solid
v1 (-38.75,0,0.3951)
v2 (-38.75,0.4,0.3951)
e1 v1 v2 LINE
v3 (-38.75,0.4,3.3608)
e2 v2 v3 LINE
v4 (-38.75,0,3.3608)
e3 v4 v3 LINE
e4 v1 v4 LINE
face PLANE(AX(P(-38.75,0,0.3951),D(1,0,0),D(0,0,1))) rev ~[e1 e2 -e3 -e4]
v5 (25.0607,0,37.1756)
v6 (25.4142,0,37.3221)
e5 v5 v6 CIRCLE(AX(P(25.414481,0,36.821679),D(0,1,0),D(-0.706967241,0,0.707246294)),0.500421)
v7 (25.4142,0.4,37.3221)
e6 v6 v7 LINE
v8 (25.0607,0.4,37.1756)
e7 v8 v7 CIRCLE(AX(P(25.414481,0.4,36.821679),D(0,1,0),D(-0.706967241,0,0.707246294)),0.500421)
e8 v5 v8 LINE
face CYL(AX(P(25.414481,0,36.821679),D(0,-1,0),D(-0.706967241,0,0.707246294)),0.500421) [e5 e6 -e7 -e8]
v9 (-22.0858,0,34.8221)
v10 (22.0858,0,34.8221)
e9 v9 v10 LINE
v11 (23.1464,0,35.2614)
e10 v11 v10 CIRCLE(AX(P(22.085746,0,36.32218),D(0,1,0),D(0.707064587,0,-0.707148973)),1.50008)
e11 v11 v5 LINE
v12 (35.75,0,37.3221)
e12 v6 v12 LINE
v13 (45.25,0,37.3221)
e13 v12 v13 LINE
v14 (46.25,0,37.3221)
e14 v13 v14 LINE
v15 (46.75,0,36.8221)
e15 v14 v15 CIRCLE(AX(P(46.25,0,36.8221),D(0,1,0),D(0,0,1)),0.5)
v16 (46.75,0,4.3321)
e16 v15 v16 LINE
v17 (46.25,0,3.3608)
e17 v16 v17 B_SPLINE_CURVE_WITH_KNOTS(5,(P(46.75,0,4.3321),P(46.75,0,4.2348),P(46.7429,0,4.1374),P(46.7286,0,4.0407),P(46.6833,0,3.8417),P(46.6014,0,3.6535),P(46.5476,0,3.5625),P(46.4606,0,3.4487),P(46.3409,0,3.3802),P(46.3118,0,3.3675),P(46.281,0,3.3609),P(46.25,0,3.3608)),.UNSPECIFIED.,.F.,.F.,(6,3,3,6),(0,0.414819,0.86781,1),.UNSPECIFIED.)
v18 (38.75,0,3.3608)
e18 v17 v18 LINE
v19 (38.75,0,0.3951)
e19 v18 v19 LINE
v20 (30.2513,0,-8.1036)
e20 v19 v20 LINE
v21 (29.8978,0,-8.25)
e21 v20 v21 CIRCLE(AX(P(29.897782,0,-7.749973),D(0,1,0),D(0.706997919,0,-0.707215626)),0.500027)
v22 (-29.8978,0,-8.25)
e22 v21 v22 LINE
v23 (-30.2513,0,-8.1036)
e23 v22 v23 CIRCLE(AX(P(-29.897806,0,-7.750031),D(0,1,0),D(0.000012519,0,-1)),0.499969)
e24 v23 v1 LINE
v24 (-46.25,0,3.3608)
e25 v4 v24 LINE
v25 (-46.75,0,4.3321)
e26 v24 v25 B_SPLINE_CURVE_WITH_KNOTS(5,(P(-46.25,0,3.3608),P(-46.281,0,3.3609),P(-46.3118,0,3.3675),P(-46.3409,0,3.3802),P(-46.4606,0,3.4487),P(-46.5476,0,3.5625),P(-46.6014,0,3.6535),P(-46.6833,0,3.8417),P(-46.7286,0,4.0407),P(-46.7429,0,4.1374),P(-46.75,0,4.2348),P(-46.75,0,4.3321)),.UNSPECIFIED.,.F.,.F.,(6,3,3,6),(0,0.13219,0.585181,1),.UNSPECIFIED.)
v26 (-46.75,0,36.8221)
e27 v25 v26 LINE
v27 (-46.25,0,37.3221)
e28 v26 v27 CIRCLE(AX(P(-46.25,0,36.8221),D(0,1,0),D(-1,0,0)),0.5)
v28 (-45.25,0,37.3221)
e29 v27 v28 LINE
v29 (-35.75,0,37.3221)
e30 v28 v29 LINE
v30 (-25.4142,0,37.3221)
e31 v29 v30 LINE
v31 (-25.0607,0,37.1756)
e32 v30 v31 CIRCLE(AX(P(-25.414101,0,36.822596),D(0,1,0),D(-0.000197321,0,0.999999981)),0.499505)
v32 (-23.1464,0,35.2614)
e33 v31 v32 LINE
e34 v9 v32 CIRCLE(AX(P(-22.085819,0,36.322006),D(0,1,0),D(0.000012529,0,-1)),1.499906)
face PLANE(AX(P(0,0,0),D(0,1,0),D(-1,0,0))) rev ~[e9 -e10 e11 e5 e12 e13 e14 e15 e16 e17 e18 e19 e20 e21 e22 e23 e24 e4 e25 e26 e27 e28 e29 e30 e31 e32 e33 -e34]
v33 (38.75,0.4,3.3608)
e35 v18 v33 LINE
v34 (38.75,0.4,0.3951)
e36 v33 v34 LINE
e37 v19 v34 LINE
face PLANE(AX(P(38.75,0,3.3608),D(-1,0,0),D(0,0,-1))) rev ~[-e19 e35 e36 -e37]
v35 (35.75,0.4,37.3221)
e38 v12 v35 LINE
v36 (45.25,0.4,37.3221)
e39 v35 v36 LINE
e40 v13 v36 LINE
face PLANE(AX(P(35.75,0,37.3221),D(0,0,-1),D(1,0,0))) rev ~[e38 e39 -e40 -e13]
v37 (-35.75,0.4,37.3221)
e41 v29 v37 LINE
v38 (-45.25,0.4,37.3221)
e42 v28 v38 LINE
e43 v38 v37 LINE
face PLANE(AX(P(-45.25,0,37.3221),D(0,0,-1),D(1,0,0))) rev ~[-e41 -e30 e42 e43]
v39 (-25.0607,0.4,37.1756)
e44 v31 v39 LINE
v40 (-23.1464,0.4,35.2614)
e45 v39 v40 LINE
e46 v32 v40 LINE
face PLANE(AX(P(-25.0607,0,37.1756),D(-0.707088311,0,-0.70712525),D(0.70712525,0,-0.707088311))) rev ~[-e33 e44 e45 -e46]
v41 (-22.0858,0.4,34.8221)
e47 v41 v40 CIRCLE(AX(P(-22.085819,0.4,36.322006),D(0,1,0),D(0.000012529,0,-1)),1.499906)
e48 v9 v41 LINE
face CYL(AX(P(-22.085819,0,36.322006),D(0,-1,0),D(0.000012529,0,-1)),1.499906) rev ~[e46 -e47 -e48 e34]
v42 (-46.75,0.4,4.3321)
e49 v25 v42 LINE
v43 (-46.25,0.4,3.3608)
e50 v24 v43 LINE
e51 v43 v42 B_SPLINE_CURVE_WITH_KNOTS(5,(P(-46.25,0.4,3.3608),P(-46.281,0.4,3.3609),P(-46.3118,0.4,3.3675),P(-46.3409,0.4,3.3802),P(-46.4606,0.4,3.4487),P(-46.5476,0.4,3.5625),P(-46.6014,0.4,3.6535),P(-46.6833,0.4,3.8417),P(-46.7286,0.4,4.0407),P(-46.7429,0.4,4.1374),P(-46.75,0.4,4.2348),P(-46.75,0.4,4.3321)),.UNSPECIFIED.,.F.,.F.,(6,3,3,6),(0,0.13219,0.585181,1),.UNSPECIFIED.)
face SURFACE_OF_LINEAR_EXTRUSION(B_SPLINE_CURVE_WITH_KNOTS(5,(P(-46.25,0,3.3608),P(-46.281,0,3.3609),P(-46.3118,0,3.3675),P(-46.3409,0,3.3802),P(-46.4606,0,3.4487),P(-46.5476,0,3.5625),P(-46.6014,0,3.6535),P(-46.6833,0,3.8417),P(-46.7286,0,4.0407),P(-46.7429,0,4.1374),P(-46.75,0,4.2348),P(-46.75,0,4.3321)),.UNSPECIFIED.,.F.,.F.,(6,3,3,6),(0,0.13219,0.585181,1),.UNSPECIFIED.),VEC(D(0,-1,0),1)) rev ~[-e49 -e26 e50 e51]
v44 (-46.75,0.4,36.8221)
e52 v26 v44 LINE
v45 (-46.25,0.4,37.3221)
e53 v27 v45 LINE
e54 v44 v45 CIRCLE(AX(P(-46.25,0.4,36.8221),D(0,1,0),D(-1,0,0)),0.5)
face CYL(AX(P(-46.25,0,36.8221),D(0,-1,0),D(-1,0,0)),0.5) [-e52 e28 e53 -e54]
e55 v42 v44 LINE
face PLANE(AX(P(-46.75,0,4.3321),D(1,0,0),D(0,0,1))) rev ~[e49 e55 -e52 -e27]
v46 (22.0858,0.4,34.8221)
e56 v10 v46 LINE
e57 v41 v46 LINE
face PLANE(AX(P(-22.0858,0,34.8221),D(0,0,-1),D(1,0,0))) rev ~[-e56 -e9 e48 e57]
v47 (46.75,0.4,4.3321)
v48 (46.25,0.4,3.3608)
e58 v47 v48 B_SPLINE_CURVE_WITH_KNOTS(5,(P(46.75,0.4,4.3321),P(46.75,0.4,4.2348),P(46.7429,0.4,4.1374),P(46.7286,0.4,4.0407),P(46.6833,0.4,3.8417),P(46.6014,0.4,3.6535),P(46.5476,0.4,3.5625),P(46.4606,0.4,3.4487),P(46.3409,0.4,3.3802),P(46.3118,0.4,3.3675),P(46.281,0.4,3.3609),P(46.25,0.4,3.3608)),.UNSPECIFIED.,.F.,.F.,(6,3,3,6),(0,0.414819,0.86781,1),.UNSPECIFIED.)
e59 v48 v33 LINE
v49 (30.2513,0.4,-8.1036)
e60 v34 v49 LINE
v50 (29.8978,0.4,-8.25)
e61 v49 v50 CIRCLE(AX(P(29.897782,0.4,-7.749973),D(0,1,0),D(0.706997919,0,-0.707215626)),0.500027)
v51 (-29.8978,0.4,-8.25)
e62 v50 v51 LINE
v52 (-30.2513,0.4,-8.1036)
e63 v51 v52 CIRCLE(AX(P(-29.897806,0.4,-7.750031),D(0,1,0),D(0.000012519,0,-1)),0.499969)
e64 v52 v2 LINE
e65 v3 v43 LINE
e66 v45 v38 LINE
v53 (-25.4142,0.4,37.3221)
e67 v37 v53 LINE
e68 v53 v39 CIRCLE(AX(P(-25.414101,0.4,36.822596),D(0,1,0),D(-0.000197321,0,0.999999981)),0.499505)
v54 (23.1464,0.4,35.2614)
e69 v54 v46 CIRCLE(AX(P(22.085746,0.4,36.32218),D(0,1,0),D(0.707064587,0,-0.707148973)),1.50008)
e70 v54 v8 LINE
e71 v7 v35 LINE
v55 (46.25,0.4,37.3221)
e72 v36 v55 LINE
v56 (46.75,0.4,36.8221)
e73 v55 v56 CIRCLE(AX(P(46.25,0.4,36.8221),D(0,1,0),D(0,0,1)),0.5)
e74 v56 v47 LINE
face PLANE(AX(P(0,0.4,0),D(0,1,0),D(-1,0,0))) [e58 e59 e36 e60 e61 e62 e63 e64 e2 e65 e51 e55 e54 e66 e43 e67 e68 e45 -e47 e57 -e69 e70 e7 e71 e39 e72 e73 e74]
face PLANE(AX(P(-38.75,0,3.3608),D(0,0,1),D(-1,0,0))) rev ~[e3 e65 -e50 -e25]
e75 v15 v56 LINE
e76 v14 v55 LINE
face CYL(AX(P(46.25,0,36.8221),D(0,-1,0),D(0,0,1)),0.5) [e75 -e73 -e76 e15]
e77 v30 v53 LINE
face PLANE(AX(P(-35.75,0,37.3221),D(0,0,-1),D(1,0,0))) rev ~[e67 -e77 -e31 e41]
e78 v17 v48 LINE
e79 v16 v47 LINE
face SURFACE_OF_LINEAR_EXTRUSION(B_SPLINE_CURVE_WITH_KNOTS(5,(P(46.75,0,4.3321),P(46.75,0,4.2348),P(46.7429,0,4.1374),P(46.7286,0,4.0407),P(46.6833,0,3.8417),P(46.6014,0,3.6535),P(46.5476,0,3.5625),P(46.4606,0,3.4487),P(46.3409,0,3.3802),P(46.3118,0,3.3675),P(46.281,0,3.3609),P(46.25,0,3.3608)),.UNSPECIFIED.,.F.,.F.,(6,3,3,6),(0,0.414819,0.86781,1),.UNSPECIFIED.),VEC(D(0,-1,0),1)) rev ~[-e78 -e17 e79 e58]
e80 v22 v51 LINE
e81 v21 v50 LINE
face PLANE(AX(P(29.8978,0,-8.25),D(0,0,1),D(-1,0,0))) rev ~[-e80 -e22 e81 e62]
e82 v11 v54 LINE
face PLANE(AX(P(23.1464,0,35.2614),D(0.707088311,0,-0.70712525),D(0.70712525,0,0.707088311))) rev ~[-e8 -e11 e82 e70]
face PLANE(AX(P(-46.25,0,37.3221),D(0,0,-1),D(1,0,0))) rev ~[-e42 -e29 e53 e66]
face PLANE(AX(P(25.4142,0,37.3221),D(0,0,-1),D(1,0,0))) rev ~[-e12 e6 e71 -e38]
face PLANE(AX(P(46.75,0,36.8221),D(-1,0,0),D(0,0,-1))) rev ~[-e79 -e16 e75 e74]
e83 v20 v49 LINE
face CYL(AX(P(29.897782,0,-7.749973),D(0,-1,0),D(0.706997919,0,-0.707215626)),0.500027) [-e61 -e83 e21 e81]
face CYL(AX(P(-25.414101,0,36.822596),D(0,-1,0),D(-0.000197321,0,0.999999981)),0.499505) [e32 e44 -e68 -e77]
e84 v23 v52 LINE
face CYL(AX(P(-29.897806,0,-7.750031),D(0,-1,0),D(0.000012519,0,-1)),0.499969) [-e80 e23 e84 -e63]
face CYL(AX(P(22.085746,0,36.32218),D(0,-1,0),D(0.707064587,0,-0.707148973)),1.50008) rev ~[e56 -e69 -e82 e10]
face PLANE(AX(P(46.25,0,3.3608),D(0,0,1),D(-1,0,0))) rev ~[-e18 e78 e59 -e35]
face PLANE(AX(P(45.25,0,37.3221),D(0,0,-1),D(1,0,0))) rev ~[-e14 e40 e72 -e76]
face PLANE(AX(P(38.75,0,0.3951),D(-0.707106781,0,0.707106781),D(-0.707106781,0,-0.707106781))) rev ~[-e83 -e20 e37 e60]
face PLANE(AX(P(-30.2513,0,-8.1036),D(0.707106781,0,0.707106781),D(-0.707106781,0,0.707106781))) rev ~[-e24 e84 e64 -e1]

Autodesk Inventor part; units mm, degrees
ref_plane "YZ Plane" through (0, 0, 0) normal (1, 0, 0) x (0, 1, 0)
ref_plane "XZ Plane" through (0, 0, 0) normal (0, 1, 0) x (-1, 0, 0)
ref_plane "XY Plane" through (0, 0, 0) normal (0, 0, 1) x (1, 0, 0)
sketch "Náčrt1" plane through (0, 0, 0) normal (0, 1, 0) x (-1, 0, 0)
  line L0 (24, -47.25) -> (19.6818, -47.25)
  line L1 (24, -47.25) -> (24, -17.0868)
  line L2 (24, -17.0868) -> (49.75, -17.0868)
  line L3 (49.75, 48.4103) -> (49.75, -17.0868)
  line L4 (49.75, 48.4103) -> (-49.75, 48.4103)
  line L5 (-49.75, 48.4103) -> (-49.75, -17.0868)
  line L6 (-24, -17.0868) -> (-49.75, -17.0868)
  line L7 (-24, -47.25) -> (-24, -17.0868)
  line L8 (-19.6818, -47.25) -> (-24, -47.25)
  arc A0 (-18.3182, -47.25) -> (-19.6818, -47.25) centre (-19, -43.5625) ccw
  line L9 (-12, -47.25) -> (-18.3182, -47.25)
  line L10 (-12, -47.25) -> (-12, -40)
  line L11 (-12, -40) -> (-3.25, -40)
  arc A1 (-3, -40.25) -> (-3.25, -40) centre (-3.25, -40.25) ccw
  line L12 (-3, -40.25) -> (-3, -40.6521)
  arc A2 (-3, -40.6521) -> (-2.6294, -40.8711) centre (-2.75, -40.6521) ccw
  arc A3 (2.0811, -47.25) -> (-2.6294, -40.8711) centre (-0.7, -44.375) ccw
  line L13 (18.3182, -47.25) -> (2.0811, -47.25)
  arc A4 (19.6818, -47.25) -> (18.3182, -47.25) centre (19, -43.5625) ccw
  arc A5 (-30.6049, -8.4571) -> (-29.8978, -8.75) centre (-29.8978, -7.75) ccw
  line L14 (-30.6049, -8.4571) -> (-39.25, 0.188)
  line L15 (-39.25, 2.8608) -> (-39.25, 0.188)
  line L16 (-46.25, 2.8608) -> (-39.25, 2.8608)
  ellipse E0 centre (-46.25, 4.3321) end of major axis (-46.25, 2.8608) minor radius 1 (-47.25, 4.3321) -> (-46.25, 2.8608) ccw
  line L17 (-47.25, 4.3321) -> (-47.25, 36.8221)
  arc A6 (-46.25, 37.8221) -> (-47.25, 36.8221) centre (-46.25, 36.8221) ccw
  line L18 (-46.25, 37.8221) -> (-45.25, 37.8221)
  arc A7 (-45.25, 37.8221) -> (-44.25, 38.8221) centre (-45.25, 38.8221) ccw
  line L19 (-44.25, 41.8041) -> (-44.25, 38.8221)
  arc A8 (-36.75, 41.8041) -> (-44.25, 41.8041) centre (-40.5, 41.8041) ccw
  line L20 (-36.75, 38.8221) -> (-36.75, 41.8041)
  arc A9 (-36.75, 38.8221) -> (-35.75, 37.8221) centre (-35.75, 38.8221) ccw
  line L21 (-35.75, 37.8221) -> (-25.4142, 37.8221)
  arc A10 (-24.7071, 37.5292) -> (-25.4142, 37.8221) centre (-25.4142, 36.8221) ccw
  line L22 (-22.7929, 35.615) -> (-24.7071, 37.5292)
  arc A11 (-22.7929, 35.615) -> (-22.0858, 35.3221) centre (-22.0858, 36.3221) ccw
  line L23 (-22.0858, 35.3221) -> (22.0858, 35.3221)
  arc A12 (22.0858, 35.3221) -> (22.7929, 35.615) centre (22.0858, 36.3221) ccw
  line L24 (22.7929, 35.615) -> (24.7071, 37.5292)
  arc A13 (25.4142, 37.8221) -> (24.7071, 37.5292) centre (25.4142, 36.8221) ccw
  line L25 (35.75, 37.8221) -> (25.4142, 37.8221)
  arc A14 (35.75, 37.8221) -> (36.75, 38.8221) centre (35.75, 38.8221) ccw
  line L26 (36.75, 38.8221) -> (36.75, 41.8041)
  arc A15 (44.25, 41.8041) -> (36.75, 41.8041) centre (40.5, 41.8041) ccw
  line L27 (44.25, 41.8041) -> (44.25, 38.8221)
  arc A16 (44.25, 38.8221) -> (45.25, 37.8221) centre (45.25, 38.8221) ccw
  line L28 (46.25, 37.8221) -> (45.25, 37.8221)
  arc A17 (47.25, 36.8221) -> (46.25, 37.8221) centre (46.25, 36.8221) ccw
  line L29 (47.25, 4.3321) -> (47.25, 36.8221)
  ellipse E1 centre (46.25, 4.3321) end of major axis (46.25, 2.8608) minor radius 1 (46.25, 2.8608) -> (47.25, 4.3321) ccw
  line L30 (46.25, 2.8608) -> (39.25, 2.8608)
  line L31 (39.25, 2.8608) -> (39.25, 0.188)
  line L32 (30.6049, -8.4571) -> (39.25, 0.188)
  arc A18 (29.8978, -8.75) -> (30.6049, -8.4571) centre (29.8978, -7.75) ccw
  line L33 (29.8978, -8.75) -> (-29.8978, -8.75)
  line L34 (-3.45, -32.125) -> (-3.45, -26.625)
  line L35 (-3.45, -26.625) -> (2.05, -26.625)
  line L36 (2.05, -26.625) -> (2.05, -32.125)
  line L37 (2.05, -32.125) -> (-3.45, -32.125)
  line L38 (6.3401, -40.3942) -> (9.6599, -40.3942)
  line L39 (9.6599, -40.3942) -> (11.3198, -43.2692)
  line L40 (11.3198, -43.2692) -> (9.6599, -46.1442)
  line L41 (9.6599, -46.1442) -> (6.3401, -46.1442)
  line L42 (6.3401, -46.1442) -> (4.6802, -43.2692)
  line L43 (4.6802, -43.2692) -> (6.3401, -40.3942)
  circle A19 centre (-19, -22.9375) radius 1.75
  circle A20 centre (-20, 39.763) radius 1.75
  circle A21 centre (20, 39.763) radius 1.75
  circle A22 centre (19, -22.9375) radius 1.75
  circle A23 centre (42.25, -8.75) radius 1.75
  circle A24 centre (-42.25, -8.75) radius 1.75
  line L44 (38.75, 0.3951) -> (38.75, 3.3608)
  line L45 (38.75, 3.3608) -> (46.25, 3.3608)
  line L46 (46.75, 4.3321) -> (46.75, 36.8221)
  arc A25 (46.75, 36.8221) -> (46.25, 37.3221) centre (46.25, 36.8221) ccw
  line L47 (46.25, 37.3221) -> (45.25, 37.3221)
  arc A26 (43.75, 38.8221) -> (45.25, 37.3221) centre (45.25, 38.8221) ccw
  line L48 (43.75, 38.8221) -> (43.75, 41.8041)
  arc A27 (43.75, 41.8041) -> (37.25, 41.8041) centre (40.5, 41.8041) ccw
  line L49 (37.25, 41.8041) -> (37.25, 38.8221)
  arc A28 (35.75, 37.3221) -> (37.25, 38.8221) centre (35.75, 38.8221) ccw
  line L50 (35.75, 37.3221) -> (25.4142, 37.3221)
  arc A29 (25.4142, 37.3221) -> (25.0607, 37.1756) centre (25.4142, 36.8221) ccw
  line L51 (25.0607, 37.1756) -> (23.1464, 35.2614)
  arc A30 (22.0858, 34.8221) -> (23.1464, 35.2614) centre (22.0858, 36.3221) ccw
  line L52 (22.0858, 34.8221) -> (-22.0858, 34.8221)
  arc A31 (-23.1464, 35.2614) -> (-22.0858, 34.8221) centre (-22.0858, 36.3221) ccw
  line L53 (-23.1464, 35.2614) -> (-25.0607, 37.1756)
  arc A32 (-25.0607, 37.1756) -> (-25.4142, 37.3221) centre (-25.4142, 36.8221) ccw
  line L54 (-25.4142, 37.3221) -> (-35.75, 37.3221)
  arc A33 (-37.25, 38.8221) -> (-35.75, 37.3221) centre (-35.75, 38.8221) ccw
  line L55 (-37.25, 38.8221) -> (-37.25, 41.8041)
  arc A34 (-37.25, 41.8041) -> (-43.75, 41.8041) centre (-40.5, 41.8041) ccw
  line L56 (-43.75, 41.8041) -> (-43.75, 38.8221)
  arc A35 (-45.25, 37.3221) -> (-43.75, 38.8221) centre (-45.25, 38.8221) ccw
  line L57 (-45.25, 37.3221) -> (-46.25, 37.3221)
  arc A36 (-46.25, 37.3221) -> (-46.75, 36.8221) centre (-46.25, 36.8221) ccw
  line L58 (-46.75, 36.8221) -> (-46.75, 4.3321)
  line L59 (-46.25, 3.3608) -> (-38.75, 3.3608)
  line L60 (-38.75, 3.3608) -> (-38.75, 0.3951)
  line L61 (-38.75, 0.3951) -> (-30.2513, -8.1036)
  arc A37 (-30.2513, -8.1036) -> (-29.8978, -8.25) centre (-29.8978, -7.75) ccw
  line L62 (-29.8978, -8.25) -> (29.8978, -8.25)
  arc A38 (29.8978, -8.25) -> (30.2513, -8.1036) centre (29.8978, -7.75) ccw
  line L63 (30.2513, -8.1036) -> (38.75, 0.3951)
  line L64 (45.25, 37.3221) -> (35.75, 37.3221)
  line L65 (-35.75, 37.3221) -> (-45.25, 37.3221)
  spline S0 degree 5 poles (46.25, 3.3609) (46.281, 3.3609) (46.3118, 3.3675) (46.3409, 3.3802) (46.4606, 3.4487) (46.5476, 3.5625) (46.6014, 3.6535) (46.6833, 3.8417) (46.7286, 4.0407) (46.7429, 4.1374) (46.75, 4.2348) (46.75, 4.3321) knots 0 0 0 0 0 0 0.13219 0.13219 0.13219 0.585181 0.585181 0.585181 1 1 1 1 1 1
  spline S1 degree 5 poles (-46.75, 4.3321) (-46.75, 4.2348) (-46.7429, 4.1374) (-46.7286, 4.0407) (-46.6833, 3.8417) (-46.6014, 3.6535) (-46.5476, 3.5625) (-46.4606, 3.4487) (-46.3409, 3.3802) (-46.3118, 3.3675) (-46.281, 3.3609) (-46.25, 3.3609) knots 0 0 0 0 0 0 0.414819 0.414819 0.414819 0.86781 0.86781 0.86781 1 1 1 1 1 1
  point P0 (0, 0)
  point P1 (0, 0)
  dimension "d0" = 0.5
extrude "Vysunutí1" add sketch "Náčrt1" along normal blind 0.4 contours L63 A38 L62 A37 L61 L60 L59 S1 L58 A36 L57 L65 L54 A32 L53 A31 L52 A30 L51 A29 L50 L64 L47 A25 L46 S0 L45 L44
properties part number "base_plate_isolation"
